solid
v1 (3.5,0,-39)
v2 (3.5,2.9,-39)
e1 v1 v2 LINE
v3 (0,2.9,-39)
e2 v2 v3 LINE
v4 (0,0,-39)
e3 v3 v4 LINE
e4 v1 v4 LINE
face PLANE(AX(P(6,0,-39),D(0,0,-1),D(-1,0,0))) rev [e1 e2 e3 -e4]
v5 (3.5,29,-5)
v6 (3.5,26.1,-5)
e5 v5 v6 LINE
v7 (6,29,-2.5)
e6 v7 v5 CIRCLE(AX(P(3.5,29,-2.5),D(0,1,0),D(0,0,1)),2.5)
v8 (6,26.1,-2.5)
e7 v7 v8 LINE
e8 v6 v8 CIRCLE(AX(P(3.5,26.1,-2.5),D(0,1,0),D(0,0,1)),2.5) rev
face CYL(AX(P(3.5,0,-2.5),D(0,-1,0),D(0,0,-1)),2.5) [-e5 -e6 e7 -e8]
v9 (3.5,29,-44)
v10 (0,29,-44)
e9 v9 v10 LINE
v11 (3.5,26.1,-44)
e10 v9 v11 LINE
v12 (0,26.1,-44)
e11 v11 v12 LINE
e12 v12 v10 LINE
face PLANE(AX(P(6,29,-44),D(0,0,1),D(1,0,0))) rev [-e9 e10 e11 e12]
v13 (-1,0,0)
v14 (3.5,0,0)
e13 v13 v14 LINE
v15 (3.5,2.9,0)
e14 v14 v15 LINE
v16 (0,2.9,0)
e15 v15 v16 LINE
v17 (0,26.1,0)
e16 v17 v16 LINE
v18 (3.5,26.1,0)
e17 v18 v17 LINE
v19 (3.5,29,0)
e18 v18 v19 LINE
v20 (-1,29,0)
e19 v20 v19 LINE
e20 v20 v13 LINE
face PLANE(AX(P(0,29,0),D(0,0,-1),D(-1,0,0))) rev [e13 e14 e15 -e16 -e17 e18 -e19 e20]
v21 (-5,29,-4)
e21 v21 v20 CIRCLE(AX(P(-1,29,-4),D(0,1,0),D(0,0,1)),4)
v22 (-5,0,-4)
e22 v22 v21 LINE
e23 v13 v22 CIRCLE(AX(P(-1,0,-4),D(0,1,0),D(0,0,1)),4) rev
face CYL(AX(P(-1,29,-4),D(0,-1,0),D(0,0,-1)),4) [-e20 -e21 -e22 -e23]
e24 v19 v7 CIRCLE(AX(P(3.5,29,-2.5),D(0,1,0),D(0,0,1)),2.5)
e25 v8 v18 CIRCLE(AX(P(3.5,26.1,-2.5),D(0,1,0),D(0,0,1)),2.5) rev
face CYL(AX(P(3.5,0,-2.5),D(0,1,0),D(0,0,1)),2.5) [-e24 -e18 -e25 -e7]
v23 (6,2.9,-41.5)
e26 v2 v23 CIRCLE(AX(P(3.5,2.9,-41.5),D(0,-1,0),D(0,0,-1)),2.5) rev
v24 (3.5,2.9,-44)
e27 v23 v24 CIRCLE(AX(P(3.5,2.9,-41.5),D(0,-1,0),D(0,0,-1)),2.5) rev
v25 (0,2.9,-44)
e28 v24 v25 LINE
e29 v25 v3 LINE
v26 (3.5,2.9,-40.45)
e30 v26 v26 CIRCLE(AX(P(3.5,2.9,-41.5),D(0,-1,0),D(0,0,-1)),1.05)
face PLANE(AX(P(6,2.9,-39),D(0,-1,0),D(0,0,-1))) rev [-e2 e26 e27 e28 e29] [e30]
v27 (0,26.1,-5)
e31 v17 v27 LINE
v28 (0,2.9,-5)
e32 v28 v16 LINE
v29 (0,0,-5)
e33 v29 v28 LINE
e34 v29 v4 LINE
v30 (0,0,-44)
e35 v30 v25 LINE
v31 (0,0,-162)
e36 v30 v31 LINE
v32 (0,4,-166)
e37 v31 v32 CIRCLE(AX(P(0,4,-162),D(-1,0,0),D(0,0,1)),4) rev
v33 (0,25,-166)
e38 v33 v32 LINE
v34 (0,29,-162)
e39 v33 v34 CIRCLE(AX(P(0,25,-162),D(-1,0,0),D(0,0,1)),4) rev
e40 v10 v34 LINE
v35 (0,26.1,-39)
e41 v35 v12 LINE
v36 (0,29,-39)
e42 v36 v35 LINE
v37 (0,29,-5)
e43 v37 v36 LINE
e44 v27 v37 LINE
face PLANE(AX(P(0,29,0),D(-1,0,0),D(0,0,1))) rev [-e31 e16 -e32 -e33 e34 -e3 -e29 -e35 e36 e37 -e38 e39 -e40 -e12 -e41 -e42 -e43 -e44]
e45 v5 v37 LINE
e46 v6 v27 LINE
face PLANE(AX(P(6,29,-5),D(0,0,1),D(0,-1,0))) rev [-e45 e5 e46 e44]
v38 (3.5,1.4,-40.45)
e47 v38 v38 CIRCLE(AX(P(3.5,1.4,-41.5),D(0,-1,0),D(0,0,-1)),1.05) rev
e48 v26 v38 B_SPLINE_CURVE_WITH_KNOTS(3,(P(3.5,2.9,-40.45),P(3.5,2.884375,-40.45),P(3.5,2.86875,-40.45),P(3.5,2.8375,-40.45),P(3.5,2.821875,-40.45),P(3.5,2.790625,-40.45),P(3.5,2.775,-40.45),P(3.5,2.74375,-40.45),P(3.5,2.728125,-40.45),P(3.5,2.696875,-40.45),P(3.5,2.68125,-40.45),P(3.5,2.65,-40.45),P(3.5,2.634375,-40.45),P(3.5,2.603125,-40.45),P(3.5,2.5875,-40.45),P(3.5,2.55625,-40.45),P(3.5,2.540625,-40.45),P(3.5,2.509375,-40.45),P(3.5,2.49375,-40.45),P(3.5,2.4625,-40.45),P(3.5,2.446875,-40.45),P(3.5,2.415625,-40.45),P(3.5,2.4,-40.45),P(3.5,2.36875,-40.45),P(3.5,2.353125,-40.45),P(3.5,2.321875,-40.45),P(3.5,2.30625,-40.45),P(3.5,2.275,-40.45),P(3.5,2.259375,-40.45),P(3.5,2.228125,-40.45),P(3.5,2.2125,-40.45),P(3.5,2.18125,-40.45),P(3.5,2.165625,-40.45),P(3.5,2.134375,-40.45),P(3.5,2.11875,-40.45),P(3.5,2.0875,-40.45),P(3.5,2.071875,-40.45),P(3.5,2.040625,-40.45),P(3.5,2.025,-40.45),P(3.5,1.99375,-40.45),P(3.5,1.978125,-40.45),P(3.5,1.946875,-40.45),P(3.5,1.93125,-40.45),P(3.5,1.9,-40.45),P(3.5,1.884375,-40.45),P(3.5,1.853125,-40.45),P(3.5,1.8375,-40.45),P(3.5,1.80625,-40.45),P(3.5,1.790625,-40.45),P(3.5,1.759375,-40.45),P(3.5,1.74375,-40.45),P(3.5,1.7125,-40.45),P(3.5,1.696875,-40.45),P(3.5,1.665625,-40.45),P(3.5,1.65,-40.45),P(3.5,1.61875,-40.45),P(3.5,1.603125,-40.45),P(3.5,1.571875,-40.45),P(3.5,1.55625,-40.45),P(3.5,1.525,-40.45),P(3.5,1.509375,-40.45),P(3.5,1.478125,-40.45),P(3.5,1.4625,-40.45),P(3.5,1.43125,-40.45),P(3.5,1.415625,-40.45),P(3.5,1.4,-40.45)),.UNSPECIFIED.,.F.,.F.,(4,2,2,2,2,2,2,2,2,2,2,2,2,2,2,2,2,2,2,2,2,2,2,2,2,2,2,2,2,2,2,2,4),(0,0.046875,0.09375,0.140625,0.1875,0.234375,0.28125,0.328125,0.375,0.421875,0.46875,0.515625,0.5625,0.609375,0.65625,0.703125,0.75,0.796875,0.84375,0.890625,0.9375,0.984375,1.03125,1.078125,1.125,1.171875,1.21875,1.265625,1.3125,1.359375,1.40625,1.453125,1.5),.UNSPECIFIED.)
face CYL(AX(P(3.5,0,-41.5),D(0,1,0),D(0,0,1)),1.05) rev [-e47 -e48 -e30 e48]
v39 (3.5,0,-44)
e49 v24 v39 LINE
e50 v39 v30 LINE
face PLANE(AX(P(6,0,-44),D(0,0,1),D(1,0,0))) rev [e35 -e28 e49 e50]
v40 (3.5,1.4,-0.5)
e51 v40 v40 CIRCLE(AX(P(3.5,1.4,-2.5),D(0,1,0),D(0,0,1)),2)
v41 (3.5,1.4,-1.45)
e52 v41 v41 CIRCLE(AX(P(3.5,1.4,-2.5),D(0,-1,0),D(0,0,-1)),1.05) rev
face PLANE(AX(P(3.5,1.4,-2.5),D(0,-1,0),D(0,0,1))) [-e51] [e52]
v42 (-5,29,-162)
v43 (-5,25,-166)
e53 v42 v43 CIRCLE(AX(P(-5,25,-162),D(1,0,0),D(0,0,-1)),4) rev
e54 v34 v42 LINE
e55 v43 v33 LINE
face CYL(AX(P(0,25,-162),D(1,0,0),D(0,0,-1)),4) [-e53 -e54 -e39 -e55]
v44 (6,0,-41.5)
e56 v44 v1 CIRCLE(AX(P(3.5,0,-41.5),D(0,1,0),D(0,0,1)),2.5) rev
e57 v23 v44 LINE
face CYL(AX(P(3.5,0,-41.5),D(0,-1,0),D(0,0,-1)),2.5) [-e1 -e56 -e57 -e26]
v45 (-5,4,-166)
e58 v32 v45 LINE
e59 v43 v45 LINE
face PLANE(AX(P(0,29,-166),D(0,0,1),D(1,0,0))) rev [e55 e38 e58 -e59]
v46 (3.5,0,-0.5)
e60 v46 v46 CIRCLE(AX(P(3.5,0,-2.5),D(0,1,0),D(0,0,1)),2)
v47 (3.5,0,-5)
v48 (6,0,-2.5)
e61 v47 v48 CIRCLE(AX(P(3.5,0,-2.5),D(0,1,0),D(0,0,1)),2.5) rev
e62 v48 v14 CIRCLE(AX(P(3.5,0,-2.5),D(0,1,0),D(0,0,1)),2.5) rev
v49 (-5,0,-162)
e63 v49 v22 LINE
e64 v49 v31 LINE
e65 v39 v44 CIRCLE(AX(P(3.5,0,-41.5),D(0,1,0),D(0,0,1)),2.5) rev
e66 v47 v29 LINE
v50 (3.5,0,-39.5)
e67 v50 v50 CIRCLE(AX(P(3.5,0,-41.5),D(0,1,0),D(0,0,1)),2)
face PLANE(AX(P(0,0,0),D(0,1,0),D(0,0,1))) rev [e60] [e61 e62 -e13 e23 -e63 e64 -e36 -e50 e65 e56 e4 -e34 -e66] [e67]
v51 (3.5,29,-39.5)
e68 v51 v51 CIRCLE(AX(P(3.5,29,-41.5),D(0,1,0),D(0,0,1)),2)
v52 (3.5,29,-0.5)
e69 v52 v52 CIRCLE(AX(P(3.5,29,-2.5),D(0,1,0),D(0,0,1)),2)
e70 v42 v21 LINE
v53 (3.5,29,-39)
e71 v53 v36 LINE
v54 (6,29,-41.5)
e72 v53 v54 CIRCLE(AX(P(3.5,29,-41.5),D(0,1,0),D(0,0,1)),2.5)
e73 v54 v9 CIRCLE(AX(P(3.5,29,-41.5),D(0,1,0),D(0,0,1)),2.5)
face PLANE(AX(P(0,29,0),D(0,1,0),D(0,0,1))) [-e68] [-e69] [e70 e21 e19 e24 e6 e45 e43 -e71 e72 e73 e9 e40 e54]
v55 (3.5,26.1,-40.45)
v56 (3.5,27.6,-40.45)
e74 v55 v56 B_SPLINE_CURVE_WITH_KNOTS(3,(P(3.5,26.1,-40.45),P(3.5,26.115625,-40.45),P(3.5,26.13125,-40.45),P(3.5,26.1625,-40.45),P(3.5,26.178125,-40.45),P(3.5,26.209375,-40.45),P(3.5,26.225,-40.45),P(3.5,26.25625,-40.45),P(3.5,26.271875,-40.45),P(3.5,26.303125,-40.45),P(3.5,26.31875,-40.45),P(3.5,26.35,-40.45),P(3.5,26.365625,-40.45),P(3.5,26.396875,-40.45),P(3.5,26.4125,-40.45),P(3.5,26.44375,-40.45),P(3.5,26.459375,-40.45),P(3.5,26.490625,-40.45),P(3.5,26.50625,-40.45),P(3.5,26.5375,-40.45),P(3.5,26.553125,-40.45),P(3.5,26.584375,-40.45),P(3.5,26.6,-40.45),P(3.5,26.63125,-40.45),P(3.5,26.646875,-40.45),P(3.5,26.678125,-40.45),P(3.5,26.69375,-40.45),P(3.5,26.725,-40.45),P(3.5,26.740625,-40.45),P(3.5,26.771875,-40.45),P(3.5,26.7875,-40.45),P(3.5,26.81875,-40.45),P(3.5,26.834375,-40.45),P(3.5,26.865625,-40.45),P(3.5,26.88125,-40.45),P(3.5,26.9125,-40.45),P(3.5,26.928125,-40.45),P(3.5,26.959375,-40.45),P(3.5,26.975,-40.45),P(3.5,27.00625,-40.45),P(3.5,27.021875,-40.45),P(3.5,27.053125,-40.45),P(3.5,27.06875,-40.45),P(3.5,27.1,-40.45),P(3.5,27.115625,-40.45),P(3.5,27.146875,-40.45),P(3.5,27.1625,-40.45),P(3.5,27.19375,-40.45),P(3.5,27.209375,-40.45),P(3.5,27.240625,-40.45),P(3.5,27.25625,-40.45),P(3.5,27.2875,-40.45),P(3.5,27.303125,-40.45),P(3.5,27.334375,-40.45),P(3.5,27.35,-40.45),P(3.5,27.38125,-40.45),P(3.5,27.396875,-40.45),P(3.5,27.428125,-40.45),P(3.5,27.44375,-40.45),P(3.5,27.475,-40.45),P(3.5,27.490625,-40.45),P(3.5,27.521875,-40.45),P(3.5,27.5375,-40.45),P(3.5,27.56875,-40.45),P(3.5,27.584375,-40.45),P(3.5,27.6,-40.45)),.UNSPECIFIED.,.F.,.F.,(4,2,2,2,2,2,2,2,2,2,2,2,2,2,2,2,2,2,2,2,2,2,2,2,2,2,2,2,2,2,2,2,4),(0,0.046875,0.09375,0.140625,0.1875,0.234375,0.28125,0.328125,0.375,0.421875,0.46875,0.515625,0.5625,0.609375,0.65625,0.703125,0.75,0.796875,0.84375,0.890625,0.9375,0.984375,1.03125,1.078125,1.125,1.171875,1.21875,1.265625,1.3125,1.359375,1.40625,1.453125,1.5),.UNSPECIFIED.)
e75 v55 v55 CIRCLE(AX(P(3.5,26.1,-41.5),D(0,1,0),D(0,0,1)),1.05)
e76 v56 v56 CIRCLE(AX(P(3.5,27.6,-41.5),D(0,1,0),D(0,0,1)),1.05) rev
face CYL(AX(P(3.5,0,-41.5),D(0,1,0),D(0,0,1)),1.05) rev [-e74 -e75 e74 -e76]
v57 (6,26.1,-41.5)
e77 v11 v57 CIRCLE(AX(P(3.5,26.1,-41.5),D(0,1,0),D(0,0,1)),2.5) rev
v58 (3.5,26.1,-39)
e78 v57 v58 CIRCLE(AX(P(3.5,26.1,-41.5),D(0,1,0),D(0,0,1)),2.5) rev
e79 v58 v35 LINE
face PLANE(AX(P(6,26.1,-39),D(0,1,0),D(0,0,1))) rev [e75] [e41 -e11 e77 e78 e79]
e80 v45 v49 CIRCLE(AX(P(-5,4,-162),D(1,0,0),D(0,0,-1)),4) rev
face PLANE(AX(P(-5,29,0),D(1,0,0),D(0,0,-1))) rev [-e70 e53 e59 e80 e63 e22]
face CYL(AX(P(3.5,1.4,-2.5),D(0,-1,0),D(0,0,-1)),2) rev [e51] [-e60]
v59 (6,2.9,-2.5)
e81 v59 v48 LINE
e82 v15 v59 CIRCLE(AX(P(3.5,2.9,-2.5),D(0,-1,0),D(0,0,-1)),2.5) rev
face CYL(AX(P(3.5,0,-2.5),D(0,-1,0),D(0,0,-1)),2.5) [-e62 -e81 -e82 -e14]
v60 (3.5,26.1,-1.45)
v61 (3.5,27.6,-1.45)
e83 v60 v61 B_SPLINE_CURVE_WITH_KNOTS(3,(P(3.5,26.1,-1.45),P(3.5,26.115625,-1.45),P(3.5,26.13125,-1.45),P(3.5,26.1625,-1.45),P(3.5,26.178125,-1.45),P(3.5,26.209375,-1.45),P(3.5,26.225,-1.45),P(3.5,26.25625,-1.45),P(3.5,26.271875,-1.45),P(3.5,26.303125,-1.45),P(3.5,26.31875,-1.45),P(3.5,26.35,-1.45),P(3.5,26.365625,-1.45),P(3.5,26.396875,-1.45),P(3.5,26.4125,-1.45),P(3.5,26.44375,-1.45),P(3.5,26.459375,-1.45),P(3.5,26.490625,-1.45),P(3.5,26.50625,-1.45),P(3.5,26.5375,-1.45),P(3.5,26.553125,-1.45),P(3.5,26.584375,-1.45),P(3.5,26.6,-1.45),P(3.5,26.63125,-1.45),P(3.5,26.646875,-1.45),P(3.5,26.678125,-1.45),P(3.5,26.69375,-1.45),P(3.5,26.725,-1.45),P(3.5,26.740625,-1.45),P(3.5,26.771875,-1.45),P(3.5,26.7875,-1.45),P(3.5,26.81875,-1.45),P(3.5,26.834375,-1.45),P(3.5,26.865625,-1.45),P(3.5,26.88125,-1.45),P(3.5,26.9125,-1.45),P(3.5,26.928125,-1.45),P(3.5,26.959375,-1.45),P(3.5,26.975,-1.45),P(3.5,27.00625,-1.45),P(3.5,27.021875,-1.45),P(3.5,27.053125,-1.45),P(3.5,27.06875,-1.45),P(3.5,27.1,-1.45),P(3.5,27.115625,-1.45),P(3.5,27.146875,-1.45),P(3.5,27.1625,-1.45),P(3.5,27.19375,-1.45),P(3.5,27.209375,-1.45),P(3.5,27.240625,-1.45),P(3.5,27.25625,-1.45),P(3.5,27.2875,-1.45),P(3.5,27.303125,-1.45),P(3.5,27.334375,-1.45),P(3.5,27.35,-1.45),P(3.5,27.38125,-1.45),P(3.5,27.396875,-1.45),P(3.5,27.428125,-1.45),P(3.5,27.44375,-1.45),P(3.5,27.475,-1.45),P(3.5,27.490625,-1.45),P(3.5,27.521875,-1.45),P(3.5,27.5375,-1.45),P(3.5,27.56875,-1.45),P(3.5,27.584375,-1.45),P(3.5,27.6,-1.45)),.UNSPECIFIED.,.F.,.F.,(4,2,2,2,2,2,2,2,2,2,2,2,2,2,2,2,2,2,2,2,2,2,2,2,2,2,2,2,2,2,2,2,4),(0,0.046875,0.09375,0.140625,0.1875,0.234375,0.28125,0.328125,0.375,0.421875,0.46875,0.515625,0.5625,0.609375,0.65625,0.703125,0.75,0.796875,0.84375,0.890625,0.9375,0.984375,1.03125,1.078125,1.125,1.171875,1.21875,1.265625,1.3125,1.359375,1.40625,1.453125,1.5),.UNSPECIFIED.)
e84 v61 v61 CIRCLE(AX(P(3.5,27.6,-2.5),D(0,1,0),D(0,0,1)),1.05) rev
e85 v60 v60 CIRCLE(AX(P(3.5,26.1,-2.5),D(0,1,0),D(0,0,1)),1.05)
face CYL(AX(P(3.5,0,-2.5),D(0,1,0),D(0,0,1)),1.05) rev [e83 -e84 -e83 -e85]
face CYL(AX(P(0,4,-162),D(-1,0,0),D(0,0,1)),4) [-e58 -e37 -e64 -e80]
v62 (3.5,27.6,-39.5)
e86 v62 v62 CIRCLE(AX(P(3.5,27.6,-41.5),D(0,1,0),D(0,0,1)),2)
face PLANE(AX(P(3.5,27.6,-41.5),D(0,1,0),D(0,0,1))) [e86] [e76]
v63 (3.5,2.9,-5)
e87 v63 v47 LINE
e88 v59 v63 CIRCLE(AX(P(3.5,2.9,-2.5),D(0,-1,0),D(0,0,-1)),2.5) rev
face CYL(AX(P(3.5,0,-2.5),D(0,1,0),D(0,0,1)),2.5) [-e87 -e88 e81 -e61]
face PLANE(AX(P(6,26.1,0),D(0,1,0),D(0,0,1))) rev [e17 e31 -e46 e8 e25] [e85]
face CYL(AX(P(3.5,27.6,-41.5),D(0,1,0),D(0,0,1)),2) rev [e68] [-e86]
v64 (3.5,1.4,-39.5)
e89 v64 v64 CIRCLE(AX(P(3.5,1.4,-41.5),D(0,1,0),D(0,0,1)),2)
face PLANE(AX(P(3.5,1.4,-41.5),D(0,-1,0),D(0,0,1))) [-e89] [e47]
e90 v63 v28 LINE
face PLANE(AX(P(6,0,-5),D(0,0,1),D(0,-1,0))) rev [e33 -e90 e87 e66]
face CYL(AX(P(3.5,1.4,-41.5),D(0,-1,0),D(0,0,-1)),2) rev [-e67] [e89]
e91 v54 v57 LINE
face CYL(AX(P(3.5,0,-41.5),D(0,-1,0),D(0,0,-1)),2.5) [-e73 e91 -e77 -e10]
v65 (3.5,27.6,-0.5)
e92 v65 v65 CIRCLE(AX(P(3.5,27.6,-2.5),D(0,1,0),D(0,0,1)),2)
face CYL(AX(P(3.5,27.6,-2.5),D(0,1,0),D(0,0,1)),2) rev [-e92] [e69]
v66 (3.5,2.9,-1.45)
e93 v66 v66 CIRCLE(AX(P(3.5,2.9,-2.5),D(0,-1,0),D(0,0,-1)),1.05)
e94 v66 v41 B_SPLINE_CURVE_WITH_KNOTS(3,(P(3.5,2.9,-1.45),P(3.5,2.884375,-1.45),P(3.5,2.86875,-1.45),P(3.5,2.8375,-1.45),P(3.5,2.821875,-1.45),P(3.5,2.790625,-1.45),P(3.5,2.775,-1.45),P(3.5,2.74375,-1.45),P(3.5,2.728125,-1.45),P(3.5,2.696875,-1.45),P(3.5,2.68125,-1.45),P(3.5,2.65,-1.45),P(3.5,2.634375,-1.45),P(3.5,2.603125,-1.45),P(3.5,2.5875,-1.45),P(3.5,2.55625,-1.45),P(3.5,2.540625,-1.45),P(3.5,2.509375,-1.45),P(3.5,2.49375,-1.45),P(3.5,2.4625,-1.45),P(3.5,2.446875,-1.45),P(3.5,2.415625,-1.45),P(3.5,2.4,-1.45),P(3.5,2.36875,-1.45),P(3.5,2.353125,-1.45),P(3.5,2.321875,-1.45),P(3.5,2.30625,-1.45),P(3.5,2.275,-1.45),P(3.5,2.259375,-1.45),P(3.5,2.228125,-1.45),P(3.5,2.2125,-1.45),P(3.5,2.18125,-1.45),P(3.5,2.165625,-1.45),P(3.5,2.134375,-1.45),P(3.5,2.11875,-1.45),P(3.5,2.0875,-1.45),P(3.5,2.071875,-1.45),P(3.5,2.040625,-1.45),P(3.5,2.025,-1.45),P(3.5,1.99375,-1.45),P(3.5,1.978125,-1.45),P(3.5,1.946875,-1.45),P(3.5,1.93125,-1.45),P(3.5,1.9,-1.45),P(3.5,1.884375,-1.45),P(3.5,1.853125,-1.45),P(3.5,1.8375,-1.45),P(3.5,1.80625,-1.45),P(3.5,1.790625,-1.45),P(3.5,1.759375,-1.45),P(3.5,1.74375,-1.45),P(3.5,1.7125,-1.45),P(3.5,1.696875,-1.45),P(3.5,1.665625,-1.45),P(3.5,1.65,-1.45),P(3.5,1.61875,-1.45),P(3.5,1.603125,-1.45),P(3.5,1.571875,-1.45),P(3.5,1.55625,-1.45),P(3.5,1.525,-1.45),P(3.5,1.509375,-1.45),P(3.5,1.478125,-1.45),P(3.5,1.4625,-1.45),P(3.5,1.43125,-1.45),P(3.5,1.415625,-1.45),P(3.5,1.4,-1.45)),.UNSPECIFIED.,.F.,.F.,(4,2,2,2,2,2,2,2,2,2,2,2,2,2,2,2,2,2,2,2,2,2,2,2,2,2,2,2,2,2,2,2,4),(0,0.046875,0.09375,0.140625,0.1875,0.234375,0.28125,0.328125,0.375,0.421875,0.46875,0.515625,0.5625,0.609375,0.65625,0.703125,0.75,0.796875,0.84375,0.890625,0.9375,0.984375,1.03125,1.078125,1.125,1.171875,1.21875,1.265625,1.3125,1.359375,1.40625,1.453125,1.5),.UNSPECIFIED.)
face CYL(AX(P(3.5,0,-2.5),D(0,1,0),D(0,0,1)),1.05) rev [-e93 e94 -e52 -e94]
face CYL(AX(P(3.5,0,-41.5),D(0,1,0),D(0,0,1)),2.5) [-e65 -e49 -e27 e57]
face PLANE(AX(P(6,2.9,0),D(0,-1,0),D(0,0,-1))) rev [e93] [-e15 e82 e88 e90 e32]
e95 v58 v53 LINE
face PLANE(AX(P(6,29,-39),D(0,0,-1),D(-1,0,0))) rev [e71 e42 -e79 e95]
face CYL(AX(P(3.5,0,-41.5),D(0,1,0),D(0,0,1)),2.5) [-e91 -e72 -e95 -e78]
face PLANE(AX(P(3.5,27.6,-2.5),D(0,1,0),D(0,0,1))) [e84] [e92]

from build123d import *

# Parameters (mm, degrees)
SKETCH1_W           = 5
SKETCH1_H           = 166
BOSS_EXTRUDE1_DEPTH = 29
SKETCH2_W           = 5
SKETCH2_H           = 2.9
BOSS_EXTRUDE2_DEPTH = 6
SKETCH3_R           = 1.05
CUT_EXTRUDE1_DEPTH  = 169.620876525
SKETCH4_R           = 2
CUT_EXTRUDE2_DEPTH  = 1.4
FILLET1_R           = 4
FILLET2_R           = 2.5


with BuildPart() as part:
    # Sketch1 → Boss-Extrude1 (new body)
    with BuildSketch(Plane(origin=(0, 0, 0), x_dir=(1, 0, 0), z_dir=(0, 1, 0))):
        with Locations((-2.5, 83)):
            Rectangle(SKETCH1_W, SKETCH1_H)
    extrude(amount=BOSS_EXTRUDE1_DEPTH)

    # Sketch2 → Boss-Extrude2 (add)
    with BuildSketch(Plane(origin=(0, 0, 0), x_dir=(0, 0, -1), z_dir=(1, 0, 0))):
        with Locations((2.5, 27.55)):
            Rectangle(SKETCH2_W, SKETCH2_H)
        with Locations((41.5, 27.55)):
            Rectangle(SKETCH2_W, SKETCH2_H)
        with Locations((41.5, 1.45)):
            Rectangle(SKETCH2_W, SKETCH2_H)
        with Locations((2.5, 1.45)):
            Rectangle(SKETCH2_W, SKETCH2_H)
    extrude(amount=BOSS_EXTRUDE2_DEPTH)

    # Sketch3 → Cut-Extrude1 (cut, through all)
    with BuildSketch(Plane(origin=(0, 29, 0), x_dir=(1, 0, 0), z_dir=(0, 1, 0))):
        with Locations(Location((3.5, 41.5, 0), (0, 0, 270))):
            Circle(SKETCH3_R)
        with Locations(Location((3.5, 2.5, 0), (0, 0, 270))):
            Circle(SKETCH3_R)
    extrude(amount=-CUT_EXTRUDE1_DEPTH, mode=Mode.SUBTRACT)

    # Sketch4 → Cut-Extrude2 (cut)
    with BuildSketch(Plane(origin=(0, 29, 0), x_dir=(1, 0, 0), z_dir=(0, 1, 0))):
        with Locations(Location((3.5, 41.5, 0), (0, 0, 270))):
            Circle(SKETCH4_R)
        with Locations(Location((3.5, 2.5, 0), (0, 0, 270))):
            Circle(SKETCH4_R)
    cut_extrude2 = extrude(amount=-CUT_EXTRUDE2_DEPTH, mode=Mode.SUBTRACT)

    # Mirror2: Cut-Extrude2 across plane
    add(cut_extrude2.mirror(Plane.ZX.offset(14.5)), mode=Mode.SUBTRACT)

    # Fillet1
    fillet1_edges = [part.edges().sort_by_distance(p)[0] for p in [
        (-2.5, 0, -166),
        (-5, 14.5, 0),
        (-2.5, 29, -166),
    ]]
    fillet(fillet1_edges, radius=FILLET1_R)

    # Fillet2
    fillet2_edges = [part.edges().sort_by_distance(p)[0] for p in [
        (6, 1.45, -5),
        (6, 1.45, 0),
        (6, 1.45, -44),
        (6, 1.45, -39),
        (6, 27.55, -44),
        (6, 27.55, -39),
        (6, 27.55, -5),
        (6, 27.55, 0),
    ]]
    fillet(fillet2_edges, radius=FILLET2_R - 0.0001)  # a hair under: the kernel refuses the full size


solid = part.part
